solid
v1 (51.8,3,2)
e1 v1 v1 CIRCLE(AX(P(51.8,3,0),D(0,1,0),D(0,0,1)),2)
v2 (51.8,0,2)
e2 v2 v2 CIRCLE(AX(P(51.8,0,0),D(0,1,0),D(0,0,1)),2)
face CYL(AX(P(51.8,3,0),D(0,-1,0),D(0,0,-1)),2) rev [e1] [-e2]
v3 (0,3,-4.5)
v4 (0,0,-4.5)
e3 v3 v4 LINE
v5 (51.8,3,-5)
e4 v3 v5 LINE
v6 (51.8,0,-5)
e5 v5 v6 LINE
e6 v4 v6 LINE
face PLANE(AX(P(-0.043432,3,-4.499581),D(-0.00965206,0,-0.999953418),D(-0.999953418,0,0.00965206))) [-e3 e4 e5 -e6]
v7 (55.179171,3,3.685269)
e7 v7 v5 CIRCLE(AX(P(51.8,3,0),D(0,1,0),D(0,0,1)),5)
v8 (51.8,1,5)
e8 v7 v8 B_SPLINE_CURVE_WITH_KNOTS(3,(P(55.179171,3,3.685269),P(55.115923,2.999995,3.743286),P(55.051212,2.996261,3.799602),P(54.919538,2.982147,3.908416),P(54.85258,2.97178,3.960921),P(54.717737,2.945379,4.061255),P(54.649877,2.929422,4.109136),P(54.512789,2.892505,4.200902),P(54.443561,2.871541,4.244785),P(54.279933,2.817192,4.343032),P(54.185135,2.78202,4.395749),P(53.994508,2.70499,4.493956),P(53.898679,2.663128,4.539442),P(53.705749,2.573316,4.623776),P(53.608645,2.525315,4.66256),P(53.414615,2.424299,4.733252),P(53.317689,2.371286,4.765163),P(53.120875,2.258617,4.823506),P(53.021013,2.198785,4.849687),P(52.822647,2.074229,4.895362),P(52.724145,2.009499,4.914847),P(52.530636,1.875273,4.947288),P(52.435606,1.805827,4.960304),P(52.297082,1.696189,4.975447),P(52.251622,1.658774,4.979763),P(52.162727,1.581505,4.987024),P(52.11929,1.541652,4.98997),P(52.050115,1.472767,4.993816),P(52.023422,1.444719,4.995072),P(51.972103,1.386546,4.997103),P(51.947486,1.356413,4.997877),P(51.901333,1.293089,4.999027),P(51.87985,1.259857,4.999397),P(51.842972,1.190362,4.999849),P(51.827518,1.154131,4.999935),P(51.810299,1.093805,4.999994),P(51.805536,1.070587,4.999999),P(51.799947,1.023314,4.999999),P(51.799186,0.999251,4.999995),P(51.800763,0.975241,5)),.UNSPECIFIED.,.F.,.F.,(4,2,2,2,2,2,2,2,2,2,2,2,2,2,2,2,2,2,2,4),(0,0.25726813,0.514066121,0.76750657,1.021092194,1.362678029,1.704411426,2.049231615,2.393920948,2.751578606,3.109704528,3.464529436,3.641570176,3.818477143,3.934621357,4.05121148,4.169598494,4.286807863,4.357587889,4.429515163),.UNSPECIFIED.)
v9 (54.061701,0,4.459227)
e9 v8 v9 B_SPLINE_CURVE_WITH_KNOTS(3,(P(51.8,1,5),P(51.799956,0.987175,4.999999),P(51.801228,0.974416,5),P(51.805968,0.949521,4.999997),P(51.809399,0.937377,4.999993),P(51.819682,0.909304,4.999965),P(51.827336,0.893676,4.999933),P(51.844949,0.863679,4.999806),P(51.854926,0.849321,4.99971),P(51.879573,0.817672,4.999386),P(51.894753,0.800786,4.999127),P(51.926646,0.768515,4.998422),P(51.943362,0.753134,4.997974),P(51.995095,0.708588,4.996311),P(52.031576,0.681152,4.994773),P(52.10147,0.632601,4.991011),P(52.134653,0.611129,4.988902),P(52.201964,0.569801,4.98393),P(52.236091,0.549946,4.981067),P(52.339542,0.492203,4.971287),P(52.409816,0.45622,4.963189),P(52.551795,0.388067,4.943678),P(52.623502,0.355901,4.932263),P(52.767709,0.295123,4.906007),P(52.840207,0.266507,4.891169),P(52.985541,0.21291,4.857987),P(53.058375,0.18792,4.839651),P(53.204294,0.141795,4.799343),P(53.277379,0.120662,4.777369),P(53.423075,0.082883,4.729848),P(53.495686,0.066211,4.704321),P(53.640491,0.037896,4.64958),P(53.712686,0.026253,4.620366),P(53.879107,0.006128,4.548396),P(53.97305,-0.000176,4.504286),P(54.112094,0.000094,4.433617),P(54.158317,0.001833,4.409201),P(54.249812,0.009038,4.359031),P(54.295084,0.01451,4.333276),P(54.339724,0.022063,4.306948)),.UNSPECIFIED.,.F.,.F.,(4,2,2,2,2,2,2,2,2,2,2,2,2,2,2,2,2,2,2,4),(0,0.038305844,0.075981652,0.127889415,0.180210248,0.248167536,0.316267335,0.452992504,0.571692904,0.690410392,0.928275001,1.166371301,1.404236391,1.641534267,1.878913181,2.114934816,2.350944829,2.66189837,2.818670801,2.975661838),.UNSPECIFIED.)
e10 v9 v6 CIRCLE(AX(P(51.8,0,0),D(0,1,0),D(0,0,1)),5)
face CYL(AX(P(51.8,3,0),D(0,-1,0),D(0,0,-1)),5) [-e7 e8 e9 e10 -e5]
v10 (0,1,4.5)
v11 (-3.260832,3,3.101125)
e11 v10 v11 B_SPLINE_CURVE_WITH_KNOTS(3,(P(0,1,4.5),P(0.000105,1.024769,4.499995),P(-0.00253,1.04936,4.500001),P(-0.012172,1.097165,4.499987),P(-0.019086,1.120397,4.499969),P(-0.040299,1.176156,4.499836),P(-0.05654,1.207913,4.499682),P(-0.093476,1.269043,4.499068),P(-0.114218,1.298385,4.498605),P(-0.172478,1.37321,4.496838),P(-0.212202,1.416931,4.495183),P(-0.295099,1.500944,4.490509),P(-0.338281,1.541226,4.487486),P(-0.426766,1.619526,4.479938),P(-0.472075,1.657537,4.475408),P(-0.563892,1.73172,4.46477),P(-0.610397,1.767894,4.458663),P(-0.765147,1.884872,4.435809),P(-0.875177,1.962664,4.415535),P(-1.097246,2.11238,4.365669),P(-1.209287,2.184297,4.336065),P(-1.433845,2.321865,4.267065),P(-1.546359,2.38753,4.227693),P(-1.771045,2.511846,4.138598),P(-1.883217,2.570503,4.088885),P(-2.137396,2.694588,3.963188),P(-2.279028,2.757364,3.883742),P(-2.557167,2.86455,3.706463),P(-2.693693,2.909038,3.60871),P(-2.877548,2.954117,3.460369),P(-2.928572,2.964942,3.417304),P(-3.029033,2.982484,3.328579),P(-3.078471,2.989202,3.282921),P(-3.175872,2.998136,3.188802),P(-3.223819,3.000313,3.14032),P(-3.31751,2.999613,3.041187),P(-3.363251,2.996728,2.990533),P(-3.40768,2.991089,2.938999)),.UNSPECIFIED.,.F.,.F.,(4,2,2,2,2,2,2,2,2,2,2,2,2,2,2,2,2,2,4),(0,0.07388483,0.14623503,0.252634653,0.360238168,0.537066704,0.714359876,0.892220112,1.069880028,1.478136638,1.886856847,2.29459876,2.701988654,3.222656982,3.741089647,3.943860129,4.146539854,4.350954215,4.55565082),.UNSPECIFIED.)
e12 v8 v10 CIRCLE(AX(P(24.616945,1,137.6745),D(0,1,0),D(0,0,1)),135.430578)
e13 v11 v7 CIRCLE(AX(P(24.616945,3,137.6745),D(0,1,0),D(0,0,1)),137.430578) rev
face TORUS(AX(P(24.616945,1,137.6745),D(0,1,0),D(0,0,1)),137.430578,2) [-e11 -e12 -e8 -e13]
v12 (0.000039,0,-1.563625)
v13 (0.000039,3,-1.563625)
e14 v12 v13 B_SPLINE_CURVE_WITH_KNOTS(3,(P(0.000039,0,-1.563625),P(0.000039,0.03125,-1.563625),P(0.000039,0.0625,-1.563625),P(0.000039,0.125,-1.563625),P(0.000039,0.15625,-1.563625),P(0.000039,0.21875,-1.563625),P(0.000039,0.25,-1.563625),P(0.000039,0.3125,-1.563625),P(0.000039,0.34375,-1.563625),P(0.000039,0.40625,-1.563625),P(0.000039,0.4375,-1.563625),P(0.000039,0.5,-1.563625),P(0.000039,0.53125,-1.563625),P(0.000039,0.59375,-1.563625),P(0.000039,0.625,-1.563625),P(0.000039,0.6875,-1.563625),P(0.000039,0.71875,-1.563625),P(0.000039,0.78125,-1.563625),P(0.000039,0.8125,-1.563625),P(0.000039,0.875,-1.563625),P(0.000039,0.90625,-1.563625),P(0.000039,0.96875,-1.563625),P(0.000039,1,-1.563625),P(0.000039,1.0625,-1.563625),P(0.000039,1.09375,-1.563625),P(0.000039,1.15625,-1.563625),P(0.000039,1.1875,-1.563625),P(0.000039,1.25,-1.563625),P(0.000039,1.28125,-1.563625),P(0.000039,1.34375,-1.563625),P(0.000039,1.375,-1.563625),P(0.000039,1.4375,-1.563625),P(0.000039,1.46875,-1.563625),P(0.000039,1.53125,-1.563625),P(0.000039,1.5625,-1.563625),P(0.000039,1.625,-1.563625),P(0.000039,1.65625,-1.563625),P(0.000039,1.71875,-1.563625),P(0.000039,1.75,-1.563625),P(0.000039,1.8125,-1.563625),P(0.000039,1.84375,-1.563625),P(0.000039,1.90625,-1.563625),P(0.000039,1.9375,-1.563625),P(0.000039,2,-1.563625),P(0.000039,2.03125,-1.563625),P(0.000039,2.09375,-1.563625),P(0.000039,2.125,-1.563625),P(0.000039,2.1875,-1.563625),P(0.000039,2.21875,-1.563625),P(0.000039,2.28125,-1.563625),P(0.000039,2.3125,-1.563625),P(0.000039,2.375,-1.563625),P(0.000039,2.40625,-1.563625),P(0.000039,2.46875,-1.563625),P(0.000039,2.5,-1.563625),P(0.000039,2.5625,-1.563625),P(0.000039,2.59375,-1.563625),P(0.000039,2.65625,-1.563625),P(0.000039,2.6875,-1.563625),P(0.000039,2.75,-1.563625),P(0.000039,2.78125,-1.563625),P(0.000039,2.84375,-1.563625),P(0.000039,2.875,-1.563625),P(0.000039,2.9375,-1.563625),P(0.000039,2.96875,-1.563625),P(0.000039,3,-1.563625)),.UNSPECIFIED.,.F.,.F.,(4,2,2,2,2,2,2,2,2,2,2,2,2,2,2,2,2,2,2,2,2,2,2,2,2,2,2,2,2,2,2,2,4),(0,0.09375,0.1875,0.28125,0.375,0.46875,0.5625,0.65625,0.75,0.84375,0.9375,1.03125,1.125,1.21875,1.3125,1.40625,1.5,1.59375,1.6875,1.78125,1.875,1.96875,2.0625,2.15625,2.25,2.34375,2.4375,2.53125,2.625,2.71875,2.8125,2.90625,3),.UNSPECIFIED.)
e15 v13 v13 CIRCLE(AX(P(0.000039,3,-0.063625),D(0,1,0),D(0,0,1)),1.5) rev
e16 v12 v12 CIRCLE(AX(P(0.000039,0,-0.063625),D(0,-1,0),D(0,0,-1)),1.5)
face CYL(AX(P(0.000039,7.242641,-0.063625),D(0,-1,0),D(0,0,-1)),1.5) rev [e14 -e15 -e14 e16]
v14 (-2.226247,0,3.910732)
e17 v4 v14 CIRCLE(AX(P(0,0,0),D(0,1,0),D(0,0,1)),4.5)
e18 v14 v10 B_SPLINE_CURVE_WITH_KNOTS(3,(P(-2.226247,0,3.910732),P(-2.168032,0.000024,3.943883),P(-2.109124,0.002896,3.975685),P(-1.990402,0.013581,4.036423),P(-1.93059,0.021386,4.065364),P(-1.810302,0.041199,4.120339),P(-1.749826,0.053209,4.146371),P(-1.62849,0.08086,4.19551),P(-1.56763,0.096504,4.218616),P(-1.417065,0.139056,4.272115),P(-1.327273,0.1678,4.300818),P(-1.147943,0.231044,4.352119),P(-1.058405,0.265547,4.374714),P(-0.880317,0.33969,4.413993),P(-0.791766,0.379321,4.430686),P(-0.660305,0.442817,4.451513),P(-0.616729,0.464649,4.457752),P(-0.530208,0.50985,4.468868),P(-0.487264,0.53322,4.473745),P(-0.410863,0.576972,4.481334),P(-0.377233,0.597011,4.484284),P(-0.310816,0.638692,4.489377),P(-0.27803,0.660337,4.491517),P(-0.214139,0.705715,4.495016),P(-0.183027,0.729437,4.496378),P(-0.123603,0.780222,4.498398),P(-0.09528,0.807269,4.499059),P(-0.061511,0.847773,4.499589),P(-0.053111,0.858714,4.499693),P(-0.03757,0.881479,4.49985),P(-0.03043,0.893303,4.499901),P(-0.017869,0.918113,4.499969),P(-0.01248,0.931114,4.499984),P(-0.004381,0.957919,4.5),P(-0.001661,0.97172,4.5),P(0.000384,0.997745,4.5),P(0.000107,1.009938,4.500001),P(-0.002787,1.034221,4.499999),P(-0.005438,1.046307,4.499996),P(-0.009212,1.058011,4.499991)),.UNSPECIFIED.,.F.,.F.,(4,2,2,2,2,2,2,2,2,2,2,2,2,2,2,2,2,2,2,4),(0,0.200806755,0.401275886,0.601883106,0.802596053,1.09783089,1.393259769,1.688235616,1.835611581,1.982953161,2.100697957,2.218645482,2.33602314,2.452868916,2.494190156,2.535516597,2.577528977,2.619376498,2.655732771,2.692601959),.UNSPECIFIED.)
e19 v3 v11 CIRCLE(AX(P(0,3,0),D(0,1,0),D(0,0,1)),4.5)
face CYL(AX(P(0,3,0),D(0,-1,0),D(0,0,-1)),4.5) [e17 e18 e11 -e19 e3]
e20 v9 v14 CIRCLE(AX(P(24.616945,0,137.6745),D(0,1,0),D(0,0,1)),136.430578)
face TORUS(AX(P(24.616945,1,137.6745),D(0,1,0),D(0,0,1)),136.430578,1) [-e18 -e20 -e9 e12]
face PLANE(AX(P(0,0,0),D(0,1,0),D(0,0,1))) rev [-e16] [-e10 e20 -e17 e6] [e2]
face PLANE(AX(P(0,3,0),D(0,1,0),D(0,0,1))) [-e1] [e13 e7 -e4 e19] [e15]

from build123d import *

# Parameters (mm, degrees)
BOSS_EXTRUDE1_OUTLINE_R = 2
BOSS_EXTRUDE1_DEPTH     = 3
CUT_EXTRUDE2_DEPTH      = 3
CUT_EXTRUDE3_DEPTH      = 58.098511364
FILLET1_R               = 2
FILLET2_R               = 1


# Read off the part's stored shape, not the designer's step: Boss-Extrude1
with BuildPart() as part:
    # Boss-Extrude1 outline → Boss-Extrude1 (new body)
    with BuildSketch(Plane(origin=(0, 0, 0), x_dir=(1, 0, 0), z_dir=(0, 1, 0))):
        with BuildLine():
            ThreePointArc((0, 4.5), (-4.5, 0), (0, -4.5))
            Line((0, -4.5), (51.8, -5))
            ThreePointArc((51.8, -5), (56.8, 0), (51.8, 5))
            Line((51.8, 5), (0, 4.5))
        make_face()
        with Locations((51.8, 0)):
            Circle(BOSS_EXTRUDE1_OUTLINE_R, mode=Mode.SUBTRACT)
    extrude(amount=BOSS_EXTRUDE1_DEPTH)

    # Sketch4 → Cut-Extrude2 (cut)
    with BuildSketch(Plane(origin=(0, 0, 0), x_dir=(-1, 0, 0), z_dir=(0, -1, 0))):
        with BuildLine():
            Line((0, 1.563625245), (0, 0))
            Line((0, 0), (0, -1.436374754))
            ThreePointArc((0, -1.436374754), (1.060634912, -0.997021111), (1.499960925, 0.063625245))
            ThreePointArc((1.499960925, 0.063625245), (1.060634912, 1.124271602), (0, 1.563625245))
        make_face()
        with BuildLine():
            Line((-1.498689077, 0), (0, 0))
            Line((0, 0), (0, 1.563625245))
            ThreePointArc((0, 1.563625245), (-1.082947037, 1.101560863), (-1.498689077, 0))
        make_face()
        with BuildLine():
            Line((0, -1.436374754), (0, 0))
            Line((0, 0), (-1.498689077, 0))
            ThreePointArc((-1.498689077, 0), (-1.037946482, -1.019309755), (0, -1.436374754))
        make_face()
        with BuildLine():
            Line((-1.498689077, 0), (0, 0))
            Line((0, 0), (0, 1.563625245))
            ThreePointArc((0, 1.563625245), (-1.082947037, 1.101560863), (-1.498689077, 0))
        make_face()
    extrude(amount=-CUT_EXTRUDE2_DEPTH, mode=Mode.SUBTRACT)

    # Sketch5 → Cut-Extrude3 (cut, through all)
    with BuildSketch(Plane.XZ):
        with BuildLine():
            Line((51.8, 5), (25.9, 4.75))
            Line((25.9, 4.75), (25.9, 2.25))
            ThreePointArc((25.9, 2.25), (38.916262453, 3.000928167), (51.8, 5))
        make_face()
        with BuildLine():
            Line((25.9, 2.25), (25.9, 4.75))
            Line((25.9, 4.75), (0, 4.5))
            ThreePointArc((0, 4.5), (12.89588572, 2.752084515), (25.9, 2.25))
        make_face()
        with BuildLine():
            Line((51.8, 5), (25.9, 4.75))
            Line((25.9, 4.75), (25.9, 2.25))
            ThreePointArc((25.9, 2.25), (38.916262453, 3.000928167), (51.8, 5))
        make_face()
        with BuildLine():
            Line((25.9, 2.25), (25.9, 4.75))
            Line((25.9, 4.75), (0, 4.5))
            ThreePointArc((0, 4.5), (12.89588572, 2.752084515), (25.9, 2.25))
        make_face()
    extrude(amount=-CUT_EXTRUDE3_DEPTH, mode=Mode.SUBTRACT)

    # Fillet1
    fillet1_edges = [part.edges().sort_by_distance(p)[0] for p in [
        (25.924129047, 3, 2.250230756),
    ]]
    fillet(fillet1_edges, radius=FILLET1_R)

    # Fillet2
    fillet2_edges = [part.edges().sort_by_distance(p)[0] for p in [
        (25.924129047, 0, 2.250230756),
    ]]
    fillet(fillet2_edges, radius=FILLET2_R - 0.0001)  # a hair under: the kernel refuses the full size


solid = part.part
